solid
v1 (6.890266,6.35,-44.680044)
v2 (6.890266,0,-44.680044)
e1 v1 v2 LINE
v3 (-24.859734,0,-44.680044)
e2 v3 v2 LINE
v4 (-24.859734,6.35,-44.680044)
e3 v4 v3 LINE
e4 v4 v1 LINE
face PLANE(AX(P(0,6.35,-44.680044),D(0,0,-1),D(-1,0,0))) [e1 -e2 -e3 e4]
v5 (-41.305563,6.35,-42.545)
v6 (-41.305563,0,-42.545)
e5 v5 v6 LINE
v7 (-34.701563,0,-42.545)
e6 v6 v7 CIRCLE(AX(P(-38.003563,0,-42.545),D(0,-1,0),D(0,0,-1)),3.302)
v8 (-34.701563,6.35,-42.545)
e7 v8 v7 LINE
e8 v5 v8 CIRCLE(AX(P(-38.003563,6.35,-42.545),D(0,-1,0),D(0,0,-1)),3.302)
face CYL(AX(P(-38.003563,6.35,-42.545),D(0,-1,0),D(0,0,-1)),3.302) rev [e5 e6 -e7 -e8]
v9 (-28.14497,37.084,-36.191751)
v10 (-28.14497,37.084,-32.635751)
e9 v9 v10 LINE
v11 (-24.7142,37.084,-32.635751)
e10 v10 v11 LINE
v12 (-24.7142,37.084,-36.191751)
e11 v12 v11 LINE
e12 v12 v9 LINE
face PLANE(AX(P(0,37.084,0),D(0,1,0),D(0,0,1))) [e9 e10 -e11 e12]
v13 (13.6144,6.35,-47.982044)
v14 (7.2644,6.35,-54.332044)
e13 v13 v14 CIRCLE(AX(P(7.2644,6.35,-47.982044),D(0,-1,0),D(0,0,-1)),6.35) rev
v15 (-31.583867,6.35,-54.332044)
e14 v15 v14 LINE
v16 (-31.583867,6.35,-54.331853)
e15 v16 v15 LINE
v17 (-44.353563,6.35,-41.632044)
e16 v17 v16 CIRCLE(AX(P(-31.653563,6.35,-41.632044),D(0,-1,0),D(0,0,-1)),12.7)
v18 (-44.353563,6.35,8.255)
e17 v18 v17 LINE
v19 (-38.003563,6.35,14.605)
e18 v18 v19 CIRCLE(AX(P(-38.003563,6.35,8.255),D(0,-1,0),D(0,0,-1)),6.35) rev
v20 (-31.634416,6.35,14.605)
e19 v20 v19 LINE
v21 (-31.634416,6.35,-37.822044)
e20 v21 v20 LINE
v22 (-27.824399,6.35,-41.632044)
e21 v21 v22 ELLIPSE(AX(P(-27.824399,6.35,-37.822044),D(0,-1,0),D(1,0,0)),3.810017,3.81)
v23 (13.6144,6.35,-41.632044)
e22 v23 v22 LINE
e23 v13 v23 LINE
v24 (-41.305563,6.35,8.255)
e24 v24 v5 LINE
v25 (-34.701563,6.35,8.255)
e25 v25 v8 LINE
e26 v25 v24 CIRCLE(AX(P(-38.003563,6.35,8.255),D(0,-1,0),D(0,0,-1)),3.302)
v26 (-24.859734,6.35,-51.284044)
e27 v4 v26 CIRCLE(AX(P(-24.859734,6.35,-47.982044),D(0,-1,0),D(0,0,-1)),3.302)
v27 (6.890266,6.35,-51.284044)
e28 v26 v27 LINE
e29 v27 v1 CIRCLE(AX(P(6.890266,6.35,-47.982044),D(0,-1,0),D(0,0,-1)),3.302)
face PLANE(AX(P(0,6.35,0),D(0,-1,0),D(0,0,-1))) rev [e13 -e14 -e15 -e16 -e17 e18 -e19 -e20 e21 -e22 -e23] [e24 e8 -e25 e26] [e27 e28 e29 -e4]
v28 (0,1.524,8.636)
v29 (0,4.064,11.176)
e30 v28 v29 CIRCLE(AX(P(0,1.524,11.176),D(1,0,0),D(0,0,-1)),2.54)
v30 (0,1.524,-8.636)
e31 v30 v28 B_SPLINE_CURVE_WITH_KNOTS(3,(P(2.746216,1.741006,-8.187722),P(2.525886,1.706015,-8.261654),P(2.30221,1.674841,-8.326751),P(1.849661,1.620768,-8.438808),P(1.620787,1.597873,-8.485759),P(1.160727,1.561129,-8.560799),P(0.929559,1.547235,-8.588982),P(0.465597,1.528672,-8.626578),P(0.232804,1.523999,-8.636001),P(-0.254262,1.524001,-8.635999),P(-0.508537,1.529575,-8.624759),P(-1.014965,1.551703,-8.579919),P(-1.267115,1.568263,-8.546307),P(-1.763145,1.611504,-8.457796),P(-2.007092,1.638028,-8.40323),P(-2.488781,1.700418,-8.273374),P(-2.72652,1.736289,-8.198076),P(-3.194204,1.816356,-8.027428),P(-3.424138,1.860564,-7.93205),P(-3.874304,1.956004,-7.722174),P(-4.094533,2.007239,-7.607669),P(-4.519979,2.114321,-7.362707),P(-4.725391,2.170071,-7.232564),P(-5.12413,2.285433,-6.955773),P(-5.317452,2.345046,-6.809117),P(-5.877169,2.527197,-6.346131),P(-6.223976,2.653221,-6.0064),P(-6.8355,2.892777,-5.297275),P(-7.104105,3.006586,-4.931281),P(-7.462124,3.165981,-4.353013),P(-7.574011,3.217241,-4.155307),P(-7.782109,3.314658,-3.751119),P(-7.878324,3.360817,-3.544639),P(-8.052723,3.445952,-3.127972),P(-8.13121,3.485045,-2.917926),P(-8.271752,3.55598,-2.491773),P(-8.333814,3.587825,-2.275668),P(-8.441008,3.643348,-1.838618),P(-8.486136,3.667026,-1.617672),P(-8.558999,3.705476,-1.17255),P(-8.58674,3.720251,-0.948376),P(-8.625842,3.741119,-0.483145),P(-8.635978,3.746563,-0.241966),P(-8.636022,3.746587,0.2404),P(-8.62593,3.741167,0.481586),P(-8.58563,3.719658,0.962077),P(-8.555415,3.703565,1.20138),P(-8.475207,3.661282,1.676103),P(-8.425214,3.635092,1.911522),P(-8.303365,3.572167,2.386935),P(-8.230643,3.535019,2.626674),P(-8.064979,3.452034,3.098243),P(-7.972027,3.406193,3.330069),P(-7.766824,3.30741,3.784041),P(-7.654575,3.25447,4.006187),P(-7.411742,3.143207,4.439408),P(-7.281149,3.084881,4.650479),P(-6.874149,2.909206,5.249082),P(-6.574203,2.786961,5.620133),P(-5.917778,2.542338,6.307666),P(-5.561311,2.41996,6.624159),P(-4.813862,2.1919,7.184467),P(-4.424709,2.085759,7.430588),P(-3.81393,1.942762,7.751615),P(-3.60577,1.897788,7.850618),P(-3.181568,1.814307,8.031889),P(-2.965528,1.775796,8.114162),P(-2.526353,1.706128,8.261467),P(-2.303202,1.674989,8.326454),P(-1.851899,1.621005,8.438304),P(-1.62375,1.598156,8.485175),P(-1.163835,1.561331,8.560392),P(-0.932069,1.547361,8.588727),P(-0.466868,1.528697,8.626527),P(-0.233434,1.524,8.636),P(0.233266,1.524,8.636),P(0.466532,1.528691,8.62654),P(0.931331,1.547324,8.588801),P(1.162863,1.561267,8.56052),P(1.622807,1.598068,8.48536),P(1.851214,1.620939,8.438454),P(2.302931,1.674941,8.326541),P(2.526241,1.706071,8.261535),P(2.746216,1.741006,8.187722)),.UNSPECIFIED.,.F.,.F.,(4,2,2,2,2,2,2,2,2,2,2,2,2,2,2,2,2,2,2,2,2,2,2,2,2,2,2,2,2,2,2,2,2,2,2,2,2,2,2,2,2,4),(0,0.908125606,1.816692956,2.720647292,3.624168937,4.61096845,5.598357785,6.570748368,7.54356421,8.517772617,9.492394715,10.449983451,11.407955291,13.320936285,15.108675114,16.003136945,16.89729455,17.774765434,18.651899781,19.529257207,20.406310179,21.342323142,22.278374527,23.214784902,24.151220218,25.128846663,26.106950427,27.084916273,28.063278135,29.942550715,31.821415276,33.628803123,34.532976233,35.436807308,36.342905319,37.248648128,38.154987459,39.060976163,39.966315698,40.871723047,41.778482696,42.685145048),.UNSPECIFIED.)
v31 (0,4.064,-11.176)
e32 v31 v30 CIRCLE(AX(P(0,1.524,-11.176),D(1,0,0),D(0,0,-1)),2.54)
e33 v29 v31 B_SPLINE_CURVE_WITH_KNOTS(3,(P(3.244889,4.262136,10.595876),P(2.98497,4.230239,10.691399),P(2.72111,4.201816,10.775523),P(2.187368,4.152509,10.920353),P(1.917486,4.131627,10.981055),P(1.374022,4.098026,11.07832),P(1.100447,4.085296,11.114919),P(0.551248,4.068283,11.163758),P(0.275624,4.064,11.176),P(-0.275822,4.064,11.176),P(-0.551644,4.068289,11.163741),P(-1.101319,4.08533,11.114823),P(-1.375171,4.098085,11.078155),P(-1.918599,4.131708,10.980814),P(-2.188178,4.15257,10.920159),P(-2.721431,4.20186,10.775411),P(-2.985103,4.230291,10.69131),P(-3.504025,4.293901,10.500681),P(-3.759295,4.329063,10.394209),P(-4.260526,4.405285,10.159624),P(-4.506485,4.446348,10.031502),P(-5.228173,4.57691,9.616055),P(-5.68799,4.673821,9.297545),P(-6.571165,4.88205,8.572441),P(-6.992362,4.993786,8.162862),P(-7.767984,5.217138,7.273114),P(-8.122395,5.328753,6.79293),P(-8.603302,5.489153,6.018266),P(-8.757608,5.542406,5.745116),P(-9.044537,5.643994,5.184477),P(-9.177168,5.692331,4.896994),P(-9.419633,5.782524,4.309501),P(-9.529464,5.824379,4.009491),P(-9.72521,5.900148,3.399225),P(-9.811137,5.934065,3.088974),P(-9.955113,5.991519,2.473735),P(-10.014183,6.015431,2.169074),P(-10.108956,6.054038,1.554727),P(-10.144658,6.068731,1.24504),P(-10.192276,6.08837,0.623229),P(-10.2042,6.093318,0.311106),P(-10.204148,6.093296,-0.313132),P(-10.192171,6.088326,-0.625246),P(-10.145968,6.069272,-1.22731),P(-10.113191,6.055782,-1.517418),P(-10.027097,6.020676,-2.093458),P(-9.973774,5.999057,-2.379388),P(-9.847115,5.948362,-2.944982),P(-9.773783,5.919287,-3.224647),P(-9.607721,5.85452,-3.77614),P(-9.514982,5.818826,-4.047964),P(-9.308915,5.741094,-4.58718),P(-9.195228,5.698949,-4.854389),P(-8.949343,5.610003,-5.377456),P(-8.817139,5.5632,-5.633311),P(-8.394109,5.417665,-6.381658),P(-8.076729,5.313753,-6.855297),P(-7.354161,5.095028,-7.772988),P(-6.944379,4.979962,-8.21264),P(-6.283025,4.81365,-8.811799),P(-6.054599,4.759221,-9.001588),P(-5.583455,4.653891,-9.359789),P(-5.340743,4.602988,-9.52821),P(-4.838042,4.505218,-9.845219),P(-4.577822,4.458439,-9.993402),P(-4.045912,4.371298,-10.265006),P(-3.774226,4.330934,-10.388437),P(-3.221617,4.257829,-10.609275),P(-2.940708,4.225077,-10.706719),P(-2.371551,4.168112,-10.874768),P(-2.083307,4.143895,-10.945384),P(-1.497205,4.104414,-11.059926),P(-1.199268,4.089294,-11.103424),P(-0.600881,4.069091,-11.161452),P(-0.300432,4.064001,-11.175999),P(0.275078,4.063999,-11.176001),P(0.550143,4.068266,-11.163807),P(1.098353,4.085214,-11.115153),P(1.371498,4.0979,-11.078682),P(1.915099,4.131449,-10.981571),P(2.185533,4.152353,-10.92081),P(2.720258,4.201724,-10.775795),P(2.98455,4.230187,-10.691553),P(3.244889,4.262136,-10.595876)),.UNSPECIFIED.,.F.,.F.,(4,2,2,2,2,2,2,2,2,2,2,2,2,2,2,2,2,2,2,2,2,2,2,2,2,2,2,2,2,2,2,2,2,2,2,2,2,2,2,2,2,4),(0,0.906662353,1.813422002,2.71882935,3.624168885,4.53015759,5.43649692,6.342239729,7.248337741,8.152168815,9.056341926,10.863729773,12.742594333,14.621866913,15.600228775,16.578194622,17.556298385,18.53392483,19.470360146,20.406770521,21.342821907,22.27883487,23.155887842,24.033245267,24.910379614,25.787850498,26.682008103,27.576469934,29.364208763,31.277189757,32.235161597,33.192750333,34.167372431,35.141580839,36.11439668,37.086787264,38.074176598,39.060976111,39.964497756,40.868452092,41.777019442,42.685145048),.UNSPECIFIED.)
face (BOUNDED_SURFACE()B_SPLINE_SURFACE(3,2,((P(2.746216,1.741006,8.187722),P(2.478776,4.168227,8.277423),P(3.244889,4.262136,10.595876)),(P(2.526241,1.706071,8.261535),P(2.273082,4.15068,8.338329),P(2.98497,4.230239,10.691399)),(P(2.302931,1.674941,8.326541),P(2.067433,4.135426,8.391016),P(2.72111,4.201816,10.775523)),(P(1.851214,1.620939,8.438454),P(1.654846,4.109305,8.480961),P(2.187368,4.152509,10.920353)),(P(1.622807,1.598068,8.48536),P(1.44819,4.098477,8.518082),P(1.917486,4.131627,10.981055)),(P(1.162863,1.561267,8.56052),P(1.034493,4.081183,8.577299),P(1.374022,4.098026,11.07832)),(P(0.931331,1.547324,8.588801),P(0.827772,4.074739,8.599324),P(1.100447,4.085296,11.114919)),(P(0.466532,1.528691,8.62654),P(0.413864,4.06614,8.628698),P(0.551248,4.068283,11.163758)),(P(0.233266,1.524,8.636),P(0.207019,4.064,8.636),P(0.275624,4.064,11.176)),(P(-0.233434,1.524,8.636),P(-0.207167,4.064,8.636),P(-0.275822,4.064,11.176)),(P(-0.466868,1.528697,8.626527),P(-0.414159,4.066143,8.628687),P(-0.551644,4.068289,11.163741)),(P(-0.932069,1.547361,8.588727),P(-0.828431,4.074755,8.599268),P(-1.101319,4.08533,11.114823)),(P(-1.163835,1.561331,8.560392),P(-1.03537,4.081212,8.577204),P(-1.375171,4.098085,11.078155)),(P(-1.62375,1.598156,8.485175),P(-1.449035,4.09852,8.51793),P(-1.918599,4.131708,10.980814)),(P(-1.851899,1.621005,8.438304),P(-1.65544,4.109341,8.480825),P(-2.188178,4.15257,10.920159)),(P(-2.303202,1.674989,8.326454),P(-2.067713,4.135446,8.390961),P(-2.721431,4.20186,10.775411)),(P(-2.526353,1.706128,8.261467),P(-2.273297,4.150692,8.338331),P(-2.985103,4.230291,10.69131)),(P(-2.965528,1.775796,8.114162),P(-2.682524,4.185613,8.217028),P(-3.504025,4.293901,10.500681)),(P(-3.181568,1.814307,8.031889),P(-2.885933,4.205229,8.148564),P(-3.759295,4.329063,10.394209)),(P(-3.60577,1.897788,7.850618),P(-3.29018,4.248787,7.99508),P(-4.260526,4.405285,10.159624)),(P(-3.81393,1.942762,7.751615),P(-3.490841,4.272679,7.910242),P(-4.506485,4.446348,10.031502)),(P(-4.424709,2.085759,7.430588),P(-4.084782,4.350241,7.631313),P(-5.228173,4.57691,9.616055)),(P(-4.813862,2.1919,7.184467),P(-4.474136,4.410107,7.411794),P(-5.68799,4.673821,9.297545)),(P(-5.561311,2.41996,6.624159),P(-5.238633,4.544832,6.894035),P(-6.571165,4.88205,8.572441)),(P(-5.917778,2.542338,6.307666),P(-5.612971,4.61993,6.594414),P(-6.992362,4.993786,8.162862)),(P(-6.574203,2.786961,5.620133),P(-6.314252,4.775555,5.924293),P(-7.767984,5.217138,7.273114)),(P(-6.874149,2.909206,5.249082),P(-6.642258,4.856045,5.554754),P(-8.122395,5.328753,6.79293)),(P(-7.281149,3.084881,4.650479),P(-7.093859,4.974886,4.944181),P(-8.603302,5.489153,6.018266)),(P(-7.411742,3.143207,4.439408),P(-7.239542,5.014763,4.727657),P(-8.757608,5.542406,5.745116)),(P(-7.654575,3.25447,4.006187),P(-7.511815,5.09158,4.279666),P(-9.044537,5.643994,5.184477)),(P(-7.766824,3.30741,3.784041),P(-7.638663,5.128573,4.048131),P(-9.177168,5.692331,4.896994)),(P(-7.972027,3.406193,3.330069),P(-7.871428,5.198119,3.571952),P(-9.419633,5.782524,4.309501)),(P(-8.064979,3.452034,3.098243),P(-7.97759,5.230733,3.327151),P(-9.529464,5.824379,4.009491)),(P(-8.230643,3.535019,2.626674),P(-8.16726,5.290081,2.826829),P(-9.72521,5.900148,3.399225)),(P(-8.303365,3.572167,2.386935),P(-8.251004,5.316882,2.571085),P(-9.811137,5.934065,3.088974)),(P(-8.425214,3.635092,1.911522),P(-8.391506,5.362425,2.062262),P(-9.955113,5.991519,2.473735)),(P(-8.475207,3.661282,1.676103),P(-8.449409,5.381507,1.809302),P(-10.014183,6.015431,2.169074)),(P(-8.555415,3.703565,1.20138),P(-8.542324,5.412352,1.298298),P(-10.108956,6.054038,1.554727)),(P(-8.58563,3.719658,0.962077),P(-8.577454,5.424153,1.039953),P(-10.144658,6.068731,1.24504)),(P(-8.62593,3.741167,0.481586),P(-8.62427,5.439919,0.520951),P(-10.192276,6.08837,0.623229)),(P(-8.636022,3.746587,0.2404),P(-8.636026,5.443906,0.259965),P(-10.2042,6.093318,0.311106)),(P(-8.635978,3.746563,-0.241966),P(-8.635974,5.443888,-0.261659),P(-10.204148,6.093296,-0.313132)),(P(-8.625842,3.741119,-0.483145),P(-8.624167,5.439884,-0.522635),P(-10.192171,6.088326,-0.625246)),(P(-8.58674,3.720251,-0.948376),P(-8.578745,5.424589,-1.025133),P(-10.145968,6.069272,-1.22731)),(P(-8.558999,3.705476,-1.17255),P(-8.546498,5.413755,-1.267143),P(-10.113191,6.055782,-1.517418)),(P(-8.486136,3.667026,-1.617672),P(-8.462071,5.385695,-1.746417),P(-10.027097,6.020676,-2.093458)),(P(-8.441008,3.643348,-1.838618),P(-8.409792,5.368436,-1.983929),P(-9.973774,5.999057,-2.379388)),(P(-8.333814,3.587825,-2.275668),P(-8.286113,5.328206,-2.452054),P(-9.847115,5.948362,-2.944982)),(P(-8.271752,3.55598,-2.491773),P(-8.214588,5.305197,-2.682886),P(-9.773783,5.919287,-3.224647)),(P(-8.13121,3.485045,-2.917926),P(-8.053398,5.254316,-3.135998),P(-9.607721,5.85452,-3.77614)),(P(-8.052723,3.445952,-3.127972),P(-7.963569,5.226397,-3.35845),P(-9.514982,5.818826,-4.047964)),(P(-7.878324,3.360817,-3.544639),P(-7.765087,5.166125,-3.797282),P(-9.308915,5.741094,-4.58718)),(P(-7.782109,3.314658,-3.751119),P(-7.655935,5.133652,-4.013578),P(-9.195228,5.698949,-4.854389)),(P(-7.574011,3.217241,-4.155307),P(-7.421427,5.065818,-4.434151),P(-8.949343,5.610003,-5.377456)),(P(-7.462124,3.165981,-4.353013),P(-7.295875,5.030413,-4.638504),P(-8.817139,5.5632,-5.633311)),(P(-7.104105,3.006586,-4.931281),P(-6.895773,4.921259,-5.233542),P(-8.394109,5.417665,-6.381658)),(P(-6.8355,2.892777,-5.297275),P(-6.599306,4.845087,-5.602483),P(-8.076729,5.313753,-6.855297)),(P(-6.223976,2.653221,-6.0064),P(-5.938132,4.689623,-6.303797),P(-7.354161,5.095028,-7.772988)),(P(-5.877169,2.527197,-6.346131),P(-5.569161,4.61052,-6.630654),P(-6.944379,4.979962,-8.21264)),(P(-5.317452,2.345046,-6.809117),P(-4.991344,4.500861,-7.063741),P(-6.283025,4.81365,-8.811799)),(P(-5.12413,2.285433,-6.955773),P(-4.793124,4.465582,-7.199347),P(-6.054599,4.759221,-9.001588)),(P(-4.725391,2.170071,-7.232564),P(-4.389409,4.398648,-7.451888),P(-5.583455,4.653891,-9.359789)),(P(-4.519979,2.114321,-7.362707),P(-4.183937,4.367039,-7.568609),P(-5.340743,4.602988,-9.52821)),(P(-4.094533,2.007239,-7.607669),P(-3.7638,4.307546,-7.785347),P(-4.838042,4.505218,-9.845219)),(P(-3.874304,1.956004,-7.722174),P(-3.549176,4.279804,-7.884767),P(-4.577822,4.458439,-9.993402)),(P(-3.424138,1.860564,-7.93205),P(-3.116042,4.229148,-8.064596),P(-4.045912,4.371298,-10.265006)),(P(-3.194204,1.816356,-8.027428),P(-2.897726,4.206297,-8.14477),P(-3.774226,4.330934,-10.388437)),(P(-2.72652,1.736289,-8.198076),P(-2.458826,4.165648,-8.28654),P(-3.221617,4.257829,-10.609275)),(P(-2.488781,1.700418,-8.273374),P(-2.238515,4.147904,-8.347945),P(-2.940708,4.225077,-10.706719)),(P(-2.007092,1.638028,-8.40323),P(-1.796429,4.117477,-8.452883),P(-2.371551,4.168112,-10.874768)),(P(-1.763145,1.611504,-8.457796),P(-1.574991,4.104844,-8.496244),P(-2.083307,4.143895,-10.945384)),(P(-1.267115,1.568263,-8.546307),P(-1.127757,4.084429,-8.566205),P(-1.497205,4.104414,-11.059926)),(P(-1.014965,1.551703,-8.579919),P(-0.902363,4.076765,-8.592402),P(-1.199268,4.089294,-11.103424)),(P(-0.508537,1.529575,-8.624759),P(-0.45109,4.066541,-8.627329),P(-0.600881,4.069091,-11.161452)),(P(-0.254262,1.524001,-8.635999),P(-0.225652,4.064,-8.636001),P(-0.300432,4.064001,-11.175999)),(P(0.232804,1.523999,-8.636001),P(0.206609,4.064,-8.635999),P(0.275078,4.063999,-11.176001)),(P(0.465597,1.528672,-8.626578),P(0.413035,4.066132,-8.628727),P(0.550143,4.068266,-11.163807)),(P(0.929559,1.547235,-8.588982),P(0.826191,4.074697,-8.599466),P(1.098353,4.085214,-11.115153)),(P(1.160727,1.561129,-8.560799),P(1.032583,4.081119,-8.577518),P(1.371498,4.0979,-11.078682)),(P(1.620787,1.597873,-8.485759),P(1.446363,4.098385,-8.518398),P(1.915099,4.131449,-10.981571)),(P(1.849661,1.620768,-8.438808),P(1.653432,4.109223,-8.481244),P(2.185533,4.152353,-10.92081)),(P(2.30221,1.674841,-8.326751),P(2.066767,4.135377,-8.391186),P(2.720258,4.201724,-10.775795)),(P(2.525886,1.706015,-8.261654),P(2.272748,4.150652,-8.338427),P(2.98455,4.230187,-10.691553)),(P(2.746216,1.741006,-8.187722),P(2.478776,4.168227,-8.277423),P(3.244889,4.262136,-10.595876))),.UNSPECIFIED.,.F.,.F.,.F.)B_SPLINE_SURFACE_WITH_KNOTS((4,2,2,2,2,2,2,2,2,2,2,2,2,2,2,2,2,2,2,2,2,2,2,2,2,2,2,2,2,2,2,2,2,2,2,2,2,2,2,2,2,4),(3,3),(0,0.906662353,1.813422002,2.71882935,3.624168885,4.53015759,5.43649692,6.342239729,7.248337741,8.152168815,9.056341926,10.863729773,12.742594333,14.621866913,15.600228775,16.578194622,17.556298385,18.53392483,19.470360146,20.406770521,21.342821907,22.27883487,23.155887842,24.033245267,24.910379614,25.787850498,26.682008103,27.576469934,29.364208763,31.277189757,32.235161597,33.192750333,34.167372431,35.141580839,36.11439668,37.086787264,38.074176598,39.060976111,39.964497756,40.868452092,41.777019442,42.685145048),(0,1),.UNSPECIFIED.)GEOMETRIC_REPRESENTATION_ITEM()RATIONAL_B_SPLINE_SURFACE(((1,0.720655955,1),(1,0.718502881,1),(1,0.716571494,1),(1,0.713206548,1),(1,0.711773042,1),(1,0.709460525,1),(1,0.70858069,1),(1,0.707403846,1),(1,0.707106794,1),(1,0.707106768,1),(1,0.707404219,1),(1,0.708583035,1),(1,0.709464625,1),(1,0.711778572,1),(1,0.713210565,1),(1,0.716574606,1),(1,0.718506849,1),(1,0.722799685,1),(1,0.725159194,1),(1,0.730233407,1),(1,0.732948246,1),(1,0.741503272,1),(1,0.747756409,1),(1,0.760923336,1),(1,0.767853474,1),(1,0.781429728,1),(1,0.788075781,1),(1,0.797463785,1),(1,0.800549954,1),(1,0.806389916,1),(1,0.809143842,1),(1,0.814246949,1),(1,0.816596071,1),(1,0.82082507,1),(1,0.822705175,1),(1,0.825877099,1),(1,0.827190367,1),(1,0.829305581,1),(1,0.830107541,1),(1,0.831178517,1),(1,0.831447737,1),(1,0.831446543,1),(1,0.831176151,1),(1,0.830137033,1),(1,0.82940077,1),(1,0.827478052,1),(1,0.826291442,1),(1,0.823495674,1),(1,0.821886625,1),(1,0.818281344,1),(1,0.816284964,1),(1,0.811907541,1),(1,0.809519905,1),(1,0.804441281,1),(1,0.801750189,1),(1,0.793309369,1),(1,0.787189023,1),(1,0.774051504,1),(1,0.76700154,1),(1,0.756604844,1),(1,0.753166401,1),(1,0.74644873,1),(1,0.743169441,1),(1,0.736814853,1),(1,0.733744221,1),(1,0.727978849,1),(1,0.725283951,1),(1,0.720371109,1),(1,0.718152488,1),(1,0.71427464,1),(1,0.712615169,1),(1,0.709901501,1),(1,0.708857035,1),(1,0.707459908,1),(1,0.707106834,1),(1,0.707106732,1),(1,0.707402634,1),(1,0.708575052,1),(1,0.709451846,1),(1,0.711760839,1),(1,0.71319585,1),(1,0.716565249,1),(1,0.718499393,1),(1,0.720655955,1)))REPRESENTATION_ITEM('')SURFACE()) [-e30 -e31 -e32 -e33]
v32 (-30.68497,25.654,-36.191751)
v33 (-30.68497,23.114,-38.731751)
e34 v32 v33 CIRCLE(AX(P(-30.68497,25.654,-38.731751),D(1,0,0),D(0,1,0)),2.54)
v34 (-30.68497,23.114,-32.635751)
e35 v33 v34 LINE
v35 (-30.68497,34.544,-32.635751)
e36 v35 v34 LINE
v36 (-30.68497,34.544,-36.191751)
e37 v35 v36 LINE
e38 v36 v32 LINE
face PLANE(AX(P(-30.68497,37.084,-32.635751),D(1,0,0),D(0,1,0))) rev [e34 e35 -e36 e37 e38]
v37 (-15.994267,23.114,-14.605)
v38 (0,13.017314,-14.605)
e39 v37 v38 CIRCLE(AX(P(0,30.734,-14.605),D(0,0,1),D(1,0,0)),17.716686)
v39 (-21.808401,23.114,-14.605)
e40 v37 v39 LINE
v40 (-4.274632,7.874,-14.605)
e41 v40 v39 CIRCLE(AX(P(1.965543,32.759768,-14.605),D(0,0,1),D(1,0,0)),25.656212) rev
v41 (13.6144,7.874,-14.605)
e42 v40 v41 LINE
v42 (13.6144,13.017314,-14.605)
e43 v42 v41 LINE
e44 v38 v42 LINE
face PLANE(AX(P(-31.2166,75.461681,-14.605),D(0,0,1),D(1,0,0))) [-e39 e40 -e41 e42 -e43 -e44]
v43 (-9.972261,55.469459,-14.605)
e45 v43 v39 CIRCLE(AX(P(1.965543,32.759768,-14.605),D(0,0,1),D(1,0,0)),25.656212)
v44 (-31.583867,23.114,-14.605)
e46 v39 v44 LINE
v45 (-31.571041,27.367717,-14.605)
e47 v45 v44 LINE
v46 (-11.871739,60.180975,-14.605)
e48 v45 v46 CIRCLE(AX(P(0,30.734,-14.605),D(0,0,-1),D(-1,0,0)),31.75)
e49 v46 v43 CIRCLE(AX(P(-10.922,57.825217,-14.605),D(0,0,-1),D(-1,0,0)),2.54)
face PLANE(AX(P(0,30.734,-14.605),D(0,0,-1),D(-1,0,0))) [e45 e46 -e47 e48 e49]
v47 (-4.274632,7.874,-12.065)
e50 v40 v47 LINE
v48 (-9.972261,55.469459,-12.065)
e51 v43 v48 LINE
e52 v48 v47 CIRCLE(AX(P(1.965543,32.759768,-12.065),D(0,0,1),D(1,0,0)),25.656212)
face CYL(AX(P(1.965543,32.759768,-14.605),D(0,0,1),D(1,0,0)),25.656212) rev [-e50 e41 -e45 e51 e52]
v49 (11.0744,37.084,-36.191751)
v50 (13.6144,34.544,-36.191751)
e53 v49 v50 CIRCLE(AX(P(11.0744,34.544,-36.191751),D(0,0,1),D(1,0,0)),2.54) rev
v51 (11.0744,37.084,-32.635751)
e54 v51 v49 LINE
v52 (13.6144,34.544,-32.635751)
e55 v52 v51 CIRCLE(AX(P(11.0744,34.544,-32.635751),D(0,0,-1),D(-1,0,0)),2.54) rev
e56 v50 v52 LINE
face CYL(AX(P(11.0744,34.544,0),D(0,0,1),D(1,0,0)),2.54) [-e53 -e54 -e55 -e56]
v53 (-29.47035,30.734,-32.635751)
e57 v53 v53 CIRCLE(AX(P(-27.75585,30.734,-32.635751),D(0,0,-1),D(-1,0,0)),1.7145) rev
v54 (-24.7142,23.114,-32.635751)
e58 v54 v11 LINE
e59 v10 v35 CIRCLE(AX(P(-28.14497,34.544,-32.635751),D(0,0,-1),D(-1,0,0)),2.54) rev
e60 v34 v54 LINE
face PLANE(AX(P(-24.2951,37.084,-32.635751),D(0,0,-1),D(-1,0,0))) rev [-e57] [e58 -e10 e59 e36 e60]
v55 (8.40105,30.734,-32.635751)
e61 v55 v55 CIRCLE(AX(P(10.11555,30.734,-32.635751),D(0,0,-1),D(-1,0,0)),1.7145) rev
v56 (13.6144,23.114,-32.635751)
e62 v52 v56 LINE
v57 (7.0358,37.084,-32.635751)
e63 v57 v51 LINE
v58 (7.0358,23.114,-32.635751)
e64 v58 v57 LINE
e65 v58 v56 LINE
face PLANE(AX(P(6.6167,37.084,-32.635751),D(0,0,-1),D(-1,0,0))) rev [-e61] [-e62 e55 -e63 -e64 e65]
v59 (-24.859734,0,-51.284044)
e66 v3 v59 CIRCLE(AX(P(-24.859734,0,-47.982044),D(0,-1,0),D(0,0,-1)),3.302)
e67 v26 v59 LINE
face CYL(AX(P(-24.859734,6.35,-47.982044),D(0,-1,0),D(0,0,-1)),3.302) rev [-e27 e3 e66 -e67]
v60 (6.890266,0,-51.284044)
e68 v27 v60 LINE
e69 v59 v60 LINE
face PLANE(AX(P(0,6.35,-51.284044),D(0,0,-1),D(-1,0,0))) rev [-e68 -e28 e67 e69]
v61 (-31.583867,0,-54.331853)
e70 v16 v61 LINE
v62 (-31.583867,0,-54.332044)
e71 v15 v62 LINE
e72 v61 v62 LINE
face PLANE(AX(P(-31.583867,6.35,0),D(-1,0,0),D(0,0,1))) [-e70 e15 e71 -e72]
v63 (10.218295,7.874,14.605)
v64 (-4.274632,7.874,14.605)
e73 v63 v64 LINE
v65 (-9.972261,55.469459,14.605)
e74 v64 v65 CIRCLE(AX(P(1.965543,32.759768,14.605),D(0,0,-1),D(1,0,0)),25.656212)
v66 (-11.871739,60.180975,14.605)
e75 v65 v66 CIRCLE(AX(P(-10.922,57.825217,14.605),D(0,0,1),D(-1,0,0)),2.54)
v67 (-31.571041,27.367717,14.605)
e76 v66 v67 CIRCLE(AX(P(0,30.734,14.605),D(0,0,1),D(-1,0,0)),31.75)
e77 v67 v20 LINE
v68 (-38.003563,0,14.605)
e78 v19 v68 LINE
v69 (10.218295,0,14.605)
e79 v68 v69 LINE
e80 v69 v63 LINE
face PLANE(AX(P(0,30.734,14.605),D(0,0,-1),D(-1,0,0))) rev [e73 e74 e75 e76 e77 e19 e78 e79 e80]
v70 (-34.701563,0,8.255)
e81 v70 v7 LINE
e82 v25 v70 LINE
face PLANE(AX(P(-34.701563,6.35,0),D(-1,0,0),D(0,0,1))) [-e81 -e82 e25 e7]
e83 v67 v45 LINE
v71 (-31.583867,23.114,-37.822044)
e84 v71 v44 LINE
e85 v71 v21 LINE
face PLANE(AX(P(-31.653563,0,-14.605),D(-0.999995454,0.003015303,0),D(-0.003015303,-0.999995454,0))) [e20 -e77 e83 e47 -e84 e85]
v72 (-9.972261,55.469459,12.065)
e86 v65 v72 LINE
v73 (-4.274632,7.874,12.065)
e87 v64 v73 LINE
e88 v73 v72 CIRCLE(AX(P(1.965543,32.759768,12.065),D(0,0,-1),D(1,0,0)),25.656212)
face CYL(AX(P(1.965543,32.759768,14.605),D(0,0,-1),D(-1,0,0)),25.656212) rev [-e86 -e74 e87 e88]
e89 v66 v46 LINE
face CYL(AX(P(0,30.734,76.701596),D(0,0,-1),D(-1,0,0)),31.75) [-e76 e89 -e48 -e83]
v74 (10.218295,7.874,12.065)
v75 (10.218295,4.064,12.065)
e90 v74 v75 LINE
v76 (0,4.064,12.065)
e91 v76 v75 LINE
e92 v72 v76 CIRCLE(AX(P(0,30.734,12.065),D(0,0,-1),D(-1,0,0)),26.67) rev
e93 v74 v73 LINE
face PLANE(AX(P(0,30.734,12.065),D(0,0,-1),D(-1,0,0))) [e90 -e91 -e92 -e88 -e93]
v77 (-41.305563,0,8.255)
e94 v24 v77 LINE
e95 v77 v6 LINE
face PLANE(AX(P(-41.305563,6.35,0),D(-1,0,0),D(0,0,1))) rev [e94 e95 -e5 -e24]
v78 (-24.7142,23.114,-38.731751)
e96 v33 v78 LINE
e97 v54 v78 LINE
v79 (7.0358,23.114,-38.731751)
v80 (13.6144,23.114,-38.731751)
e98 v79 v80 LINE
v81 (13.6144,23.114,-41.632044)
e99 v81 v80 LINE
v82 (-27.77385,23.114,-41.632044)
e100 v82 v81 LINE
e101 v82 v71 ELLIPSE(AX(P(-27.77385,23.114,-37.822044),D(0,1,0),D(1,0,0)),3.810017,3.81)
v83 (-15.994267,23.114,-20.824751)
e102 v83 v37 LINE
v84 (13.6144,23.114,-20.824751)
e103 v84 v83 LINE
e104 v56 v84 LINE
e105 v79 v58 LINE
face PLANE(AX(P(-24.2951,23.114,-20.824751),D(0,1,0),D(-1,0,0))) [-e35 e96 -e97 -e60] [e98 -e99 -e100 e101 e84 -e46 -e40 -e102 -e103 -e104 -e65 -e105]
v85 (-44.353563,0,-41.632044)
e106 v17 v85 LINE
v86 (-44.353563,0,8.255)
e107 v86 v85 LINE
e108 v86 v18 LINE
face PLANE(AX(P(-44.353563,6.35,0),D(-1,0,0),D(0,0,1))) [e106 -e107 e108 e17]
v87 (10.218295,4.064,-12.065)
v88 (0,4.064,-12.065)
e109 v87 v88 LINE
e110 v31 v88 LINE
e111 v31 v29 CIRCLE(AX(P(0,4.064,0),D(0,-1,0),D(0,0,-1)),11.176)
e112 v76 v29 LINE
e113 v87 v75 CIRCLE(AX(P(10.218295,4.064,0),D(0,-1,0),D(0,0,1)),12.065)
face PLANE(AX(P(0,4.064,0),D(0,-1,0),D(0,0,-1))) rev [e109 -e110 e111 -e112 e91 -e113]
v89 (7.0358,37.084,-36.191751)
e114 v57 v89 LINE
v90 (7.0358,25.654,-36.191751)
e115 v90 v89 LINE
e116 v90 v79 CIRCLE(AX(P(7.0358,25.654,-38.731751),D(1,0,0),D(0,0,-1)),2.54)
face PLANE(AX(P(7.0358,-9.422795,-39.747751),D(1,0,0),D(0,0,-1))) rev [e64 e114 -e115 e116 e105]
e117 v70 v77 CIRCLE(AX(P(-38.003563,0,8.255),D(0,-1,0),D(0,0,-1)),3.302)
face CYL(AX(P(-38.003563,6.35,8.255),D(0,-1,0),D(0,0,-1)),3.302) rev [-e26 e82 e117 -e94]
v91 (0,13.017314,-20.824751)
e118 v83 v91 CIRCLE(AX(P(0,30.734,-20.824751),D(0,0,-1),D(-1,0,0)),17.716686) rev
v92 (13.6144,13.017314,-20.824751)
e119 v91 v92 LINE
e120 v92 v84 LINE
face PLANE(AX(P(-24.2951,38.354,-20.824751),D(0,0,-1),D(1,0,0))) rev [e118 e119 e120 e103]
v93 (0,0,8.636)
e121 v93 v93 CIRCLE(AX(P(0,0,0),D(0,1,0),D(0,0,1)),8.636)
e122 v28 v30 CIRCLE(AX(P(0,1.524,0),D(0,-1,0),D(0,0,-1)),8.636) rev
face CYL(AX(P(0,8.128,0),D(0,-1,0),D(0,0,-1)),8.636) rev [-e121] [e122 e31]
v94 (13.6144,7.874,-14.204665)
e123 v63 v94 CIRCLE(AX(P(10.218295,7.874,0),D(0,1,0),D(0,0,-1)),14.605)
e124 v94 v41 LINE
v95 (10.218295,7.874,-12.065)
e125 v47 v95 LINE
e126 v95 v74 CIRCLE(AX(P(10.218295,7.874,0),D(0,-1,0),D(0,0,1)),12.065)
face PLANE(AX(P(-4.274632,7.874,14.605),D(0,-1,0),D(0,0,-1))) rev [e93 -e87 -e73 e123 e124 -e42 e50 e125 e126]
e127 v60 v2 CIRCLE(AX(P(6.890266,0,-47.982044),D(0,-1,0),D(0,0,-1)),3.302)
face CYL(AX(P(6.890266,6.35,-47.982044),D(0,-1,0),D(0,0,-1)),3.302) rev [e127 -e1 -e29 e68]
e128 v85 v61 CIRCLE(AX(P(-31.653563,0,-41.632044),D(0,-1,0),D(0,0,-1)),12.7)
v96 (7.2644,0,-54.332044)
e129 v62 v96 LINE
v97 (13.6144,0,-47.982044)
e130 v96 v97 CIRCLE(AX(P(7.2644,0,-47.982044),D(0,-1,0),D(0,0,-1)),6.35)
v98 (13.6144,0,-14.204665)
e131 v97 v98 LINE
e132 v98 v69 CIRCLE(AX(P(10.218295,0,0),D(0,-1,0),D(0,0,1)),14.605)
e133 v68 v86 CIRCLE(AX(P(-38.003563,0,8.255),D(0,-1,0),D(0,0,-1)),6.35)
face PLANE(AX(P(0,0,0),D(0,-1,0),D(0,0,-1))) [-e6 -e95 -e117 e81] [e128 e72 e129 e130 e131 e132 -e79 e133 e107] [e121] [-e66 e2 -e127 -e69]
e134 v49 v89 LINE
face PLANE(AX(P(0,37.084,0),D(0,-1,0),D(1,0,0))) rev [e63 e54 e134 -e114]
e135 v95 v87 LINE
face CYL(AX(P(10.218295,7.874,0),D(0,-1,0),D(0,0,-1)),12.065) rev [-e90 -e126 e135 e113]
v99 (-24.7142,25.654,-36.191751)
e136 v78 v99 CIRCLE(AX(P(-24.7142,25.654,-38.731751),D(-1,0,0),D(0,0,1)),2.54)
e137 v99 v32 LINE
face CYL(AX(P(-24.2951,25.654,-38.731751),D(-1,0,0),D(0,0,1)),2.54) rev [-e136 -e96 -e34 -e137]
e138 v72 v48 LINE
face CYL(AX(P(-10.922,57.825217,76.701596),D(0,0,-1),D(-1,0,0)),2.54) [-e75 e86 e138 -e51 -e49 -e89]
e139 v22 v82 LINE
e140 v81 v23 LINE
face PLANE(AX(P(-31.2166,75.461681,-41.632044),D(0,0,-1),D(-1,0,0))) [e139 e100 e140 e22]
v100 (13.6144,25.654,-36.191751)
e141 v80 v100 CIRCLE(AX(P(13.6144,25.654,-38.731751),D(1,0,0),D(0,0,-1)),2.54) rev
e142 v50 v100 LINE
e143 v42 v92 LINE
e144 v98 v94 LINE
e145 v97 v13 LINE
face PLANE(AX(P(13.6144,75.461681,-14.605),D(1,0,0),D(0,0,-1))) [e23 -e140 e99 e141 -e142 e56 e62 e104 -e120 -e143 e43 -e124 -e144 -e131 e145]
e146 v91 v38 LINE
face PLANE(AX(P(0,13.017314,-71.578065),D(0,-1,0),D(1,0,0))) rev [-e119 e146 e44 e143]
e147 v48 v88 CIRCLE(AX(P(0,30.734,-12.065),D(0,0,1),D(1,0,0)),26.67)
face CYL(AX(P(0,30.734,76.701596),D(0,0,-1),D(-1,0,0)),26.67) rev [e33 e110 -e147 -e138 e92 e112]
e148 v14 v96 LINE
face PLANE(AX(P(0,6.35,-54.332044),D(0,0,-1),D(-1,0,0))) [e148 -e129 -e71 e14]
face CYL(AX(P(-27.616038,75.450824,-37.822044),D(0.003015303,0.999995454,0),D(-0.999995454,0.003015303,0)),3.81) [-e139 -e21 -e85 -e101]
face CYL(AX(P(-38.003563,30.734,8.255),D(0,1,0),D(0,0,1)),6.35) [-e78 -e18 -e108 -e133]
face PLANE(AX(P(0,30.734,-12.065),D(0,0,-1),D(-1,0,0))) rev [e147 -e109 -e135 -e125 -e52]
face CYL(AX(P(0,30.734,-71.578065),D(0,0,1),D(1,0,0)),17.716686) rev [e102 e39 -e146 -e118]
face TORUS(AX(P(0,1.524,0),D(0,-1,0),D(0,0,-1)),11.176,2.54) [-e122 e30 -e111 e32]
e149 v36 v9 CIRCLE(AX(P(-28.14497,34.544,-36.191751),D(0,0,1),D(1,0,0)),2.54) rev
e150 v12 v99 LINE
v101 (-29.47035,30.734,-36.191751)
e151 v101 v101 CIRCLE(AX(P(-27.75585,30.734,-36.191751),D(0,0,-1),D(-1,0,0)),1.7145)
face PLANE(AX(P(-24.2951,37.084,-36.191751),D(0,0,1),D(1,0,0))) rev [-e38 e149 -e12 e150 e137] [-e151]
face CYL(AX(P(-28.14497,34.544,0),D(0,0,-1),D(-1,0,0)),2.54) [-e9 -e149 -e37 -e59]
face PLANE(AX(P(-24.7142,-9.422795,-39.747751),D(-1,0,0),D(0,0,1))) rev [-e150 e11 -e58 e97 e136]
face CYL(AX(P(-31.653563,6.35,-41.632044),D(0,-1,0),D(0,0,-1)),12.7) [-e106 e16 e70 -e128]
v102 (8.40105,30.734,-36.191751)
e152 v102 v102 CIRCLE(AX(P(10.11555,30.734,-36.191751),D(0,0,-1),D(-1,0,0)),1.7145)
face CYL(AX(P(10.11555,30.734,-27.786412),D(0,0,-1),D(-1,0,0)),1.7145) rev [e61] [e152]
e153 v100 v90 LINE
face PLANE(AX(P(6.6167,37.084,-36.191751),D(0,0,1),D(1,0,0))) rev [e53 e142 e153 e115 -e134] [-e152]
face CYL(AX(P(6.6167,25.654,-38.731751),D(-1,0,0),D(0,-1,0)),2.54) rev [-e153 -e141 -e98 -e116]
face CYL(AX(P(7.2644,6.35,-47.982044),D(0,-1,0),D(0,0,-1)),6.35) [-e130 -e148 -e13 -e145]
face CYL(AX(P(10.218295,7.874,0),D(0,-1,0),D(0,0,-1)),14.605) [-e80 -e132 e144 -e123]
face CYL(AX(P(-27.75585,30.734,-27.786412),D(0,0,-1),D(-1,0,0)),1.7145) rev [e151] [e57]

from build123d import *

# Parameters (mm, degrees)
SKETCH1_W                       = 63.5
SKETCH1_H                       = 24.13
BOSS_EXTRUDE1_DEPTH             = 4.064
BOSS_EXTRUDE2_REACH             = 36.207
BOSS_EXTRUDE2_DIRECTION_2_REACH = 36.207
CUT_EXTRUDE1_DEPTH              = 4.064
CUT_EXTRUDE1_DEPTH_BACK         = 66.752974943
SKETCH4_R                       = 8.636
FILLET1_R                       = 2.54
CUT_EXTRUDE2_DEPTH              = 73.348315655
BOSS_EXTRUDE3_DEPTH             = 2.54
BOSS_EXTRUDE4_START             = 2.54
BOSS_EXTRUDE4_DEPTH             = 2.54
BOSS_EXTRUDE5_DEPTH             = 3.81
CUT_EXTRUDE3_DEPTH              = 64.061052508
BOSS_EXTRUDE6_START             = -23.114
SKETCH12_W                      = 44.831
SKETCH12_H                      = 27.027043781
BOSS_EXTRUDE6_DEPTH             = 23.114
BOSS_EXTRUDE7_DEPTH             = 7.874
CUT_EXTRUDE4_START              = -6.219751
CUT_EXTRUDE4_DEPTH              = 6.219751
CUT_EXTRUDE5_DEPTH              = 27.027043781
SKETCH17_W                      = 6.9977
SKETCH17_H                      = 3.556
BOSS_EXTRUDE8_DEPTH             = 13.97
SKETCH18_W                      = 6.389869694
SKETCH18_H                      = 3.556
BOSS_EXTRUDE9_DEPTH             = 13.97
SKETCH19_W                      = 31.75
SKETCH19_H                      = 7.112
CUT_EXTRUDE6_DEPTH              = 13.97
CUT_EXTRUDE7_REACH              = 87.043
SKETCH20_R                      = 1.7145
FILLET2_R                       = 2.54
FILLET3_R                       = 2.54
FILLET4_R                       = 2.54
BOSS_EXTRUDE10_DEPTH            = 29.21
BOSS_EXTRUDE11_DEPTH            = 27.027043781
BOSS_EXTRUDE16_DEPTH            = 6.35
FILLET5_R                       = 6.35
FILLET6_R                       = 3.81


with BuildPart() as part:
    # Sketch1 → Boss-Extrude1 (new body)
    with BuildSketch(Plane(origin=(0, 0, 0), x_dir=(1, 0, 0), z_dir=(0, 1, 0))):
        Rectangle(SKETCH1_W, SKETCH1_H)
    extrude(amount=BOSS_EXTRUDE1_DEPTH)

    # Boss-Extrude2: up to this face of the body (flat: up to its plane)
    boss_extrude2_end = Plane(part.part.faces().sort_by_distance((0, 2.032, 12.065))[0])
    # Sketch2 → Boss-Extrude2 (add, up to the picked face)
    with BuildSketch(Plane.XY, mode=Mode.PRIVATE) as boss_extrude2_sk1:
        with BuildLine():
            Line((0, 4.064), (-26.716755185, 4.064))
            Line((-26.716755185, 4.064), (-31.571041118, 27.367716778))
            ThreePointArc((-31.571041118, 27.367716778), (-27.221246487, 47.076161415), (-11.87173913, 60.180974548))
            ThreePointArc((-11.87173913, 60.180974548), (-8.566242036, 58.774955714), (-9.97226087, 55.46945862))
            ThreePointArc((-9.97226087, 55.46945862), (-26.181898149, 25.654914521), (0, 4.064))
        make_face()
    boss_extrude2_tool1 = split(extrude(boss_extrude2_sk1.sketch, amount=BOSS_EXTRUDE2_REACH, mode=Mode.PRIVATE), bisect_by=boss_extrude2_end, keep=Keep.BOTH, mode=Mode.PRIVATE)
    add(boss_extrude2_tool1.solids().sort_by(Axis((-9.165723, 58.533271, 0), (0, 0, 1)))[0])

    # Boss-Extrude2 direction 2: up to this face of the body (flat: up to its plane)
    boss_extrude2_direction_2_end = Plane(part.part.faces().sort_by_distance((0, 2.032, -12.065))[0])
    # Sketch2 → Boss-Extrude2 direction 2 (add, up to the picked face)
    with BuildSketch(Plane.XY, mode=Mode.PRIVATE) as boss_extrude2_direction_2_sk1:
        with BuildLine():
            Line((0, 4.064), (-26.716755185, 4.064))
            Line((-26.716755185, 4.064), (-31.571041118, 27.367716778))
            ThreePointArc((-31.571041118, 27.367716778), (-27.221246487, 47.076161415), (-11.87173913, 60.180974548))
            ThreePointArc((-11.87173913, 60.180974548), (-8.566242036, 58.774955714), (-9.97226087, 55.46945862))
            ThreePointArc((-9.97226087, 55.46945862), (-26.181898149, 25.654914521), (0, 4.064))
        make_face()
    boss_extrude2_direction_2_tool1 = split(extrude(boss_extrude2_direction_2_sk1.sketch, amount=-BOSS_EXTRUDE2_DIRECTION_2_REACH, mode=Mode.PRIVATE), bisect_by=boss_extrude2_direction_2_end, keep=Keep.BOTH, mode=Mode.PRIVATE)
    add(boss_extrude2_direction_2_tool1.solids().sort_by(Axis((-9.165723, 58.533271, 0), (0, 0, -1)))[0])

    # Sketch4 → Cut-Extrude1 (cut, two sides: drawn at the far end of the back side and taken through both)
    with BuildSketch(Plane(origin=(0, 4.064, 0), x_dir=(1, 0, 0), z_dir=(0, 1, 0)).offset(-CUT_EXTRUDE1_DEPTH_BACK)):
        with Locations(Location((0, 0, 0), (0, 0, 270))):
            Circle(SKETCH4_R)
    extrude(amount=CUT_EXTRUDE1_DEPTH + CUT_EXTRUDE1_DEPTH_BACK, mode=Mode.SUBTRACT)

    # Fillet1
    fillet1_edges = [part.edges().sort_by_distance(p)[0] for p in [
        (-8.636, 5.50091846, 0),
        (8.636, 4.064, 0),
    ]]
    fillet(fillet1_edges, radius=FILLET1_R)

    # Sketch6 → Cut-Extrude2 (cut, through all)
    with BuildSketch(Plane.XY.offset(12.065)):
        Polygon((-31.75, 4.064), (-26.716755185, 4.064), (-25.870202757, 0), (-31.75, 0), align=None)
    extrude(amount=-CUT_EXTRUDE2_DEPTH, mode=Mode.SUBTRACT)

    # Sketch8 → Boss-Extrude3 (add)
    with BuildSketch(Plane.XY.offset(12.065)):
        with BuildLine():
            Line((31.75, 0), (31.75, 7.874))
            Line((31.75, 7.874), (-4.274632474, 7.874))
            ThreePointArc((-4.274632474, 7.874), (-23.508790492, 29.710248048), (-9.97226087, 55.46945862))
            ThreePointArc((-9.97226087, 55.46945862), (-8.566242036, 58.774955714), (-11.87173913, 60.180974548))
            ThreePointArc((-11.87173913, 60.180974548), (-27.221246487, 47.076161415), (-31.571041118, 27.367716778))
            Line((-31.571041118, 27.367716778), (-25.870202757, 0))
            Line((-25.870202757, 0), (31.75, 0))
        make_face()
    extrude(amount=BOSS_EXTRUDE3_DEPTH)

    # Sketch9 → Boss-Extrude4 (add)
    with BuildSketch(Plane(origin=(0, 0, -12.065), x_dir=(-1, 0, 0), z_dir=(0, 0, -1)).offset(BOSS_EXTRUDE4_START)):
        with BuildLine():
            Line((-31.75, 0), (-31.75, 7.874))
            Line((-31.75, 7.874), (4.274632474, 7.874))
            ThreePointArc((4.274632474, 7.874), (23.508790492, 29.710248048), (9.97226087, 55.46945862))
            ThreePointArc((9.97226087, 55.46945862), (8.566242036, 58.774955714), (11.87173913, 60.180974548))
            ThreePointArc((11.87173913, 60.180974548), (27.221246487, 47.076161415), (31.571041118, 27.367716778))
            Line((31.571041118, 27.367716778), (25.870202757, 0))
            Line((25.870202757, 0), (-31.75, 0))
        make_face()
    extrude(amount=-BOSS_EXTRUDE4_DEPTH)

    # Sketch10 → Boss-Extrude5 (add)
    with BuildSketch(Plane(origin=(0, 4.064, 0), x_dir=(1, 0, 0), z_dir=(0, 1, 0))):
        with BuildLine():
            Line((10.218295125, 14.605), (10.218295125, 12.065))
            ThreePointArc((10.218295125, 12.065), (22.283295125, 0), (10.218295125, -12.065))
            Line((10.218295125, -12.065), (10.218295125, -14.605))
            ThreePointArc((10.218295125, -14.605), (24.823295125, 0), (10.218295125, 14.605))
        make_face()
    extrude(amount=BOSS_EXTRUDE5_DEPTH)

    # Sketch11 → Cut-Extrude3 (cut, through all)
    with BuildSketch(Plane(origin=(0, 7.874, 0), x_dir=(1, 0, 0), z_dir=(0, 1, 0))):
        with BuildLine():
            Line((10.218295125, 14.605), (31.75, 14.605))
            Line((31.75, 14.605), (31.75, -14.605))
            Line((31.75, -14.605), (10.218295125, -14.605))
            ThreePointArc((10.218295125, -14.605), (24.823295125, 0), (10.218295125, 14.605))
        make_face()
    extrude(amount=-CUT_EXTRUDE3_DEPTH, mode=Mode.SUBTRACT)

    # Sketch12 → Boss-Extrude6 (add)
    with BuildSketch(Plane.XZ.offset(BOSS_EXTRUDE6_START)):
        with Locations((-8.8011, -28.11852189)):
            Rectangle(SKETCH12_W, SKETCH12_H)
    extrude(amount=BOSS_EXTRUDE6_DEPTH)

    # Sketch13 → Boss-Extrude7 (add)
    with BuildSketch(Plane.XZ):
        Polygon((10.218295125, -14.605), (13.6144, -14.605), (13.6144, -13.335525526), align=None)
    extrude(amount=-BOSS_EXTRUDE7_DEPTH)

    # Sketch14 → Cut-Extrude4 (cut)
    with BuildSketch(Plane.XY.offset(-14.605).offset(CUT_EXTRUDE4_START)):
        with BuildLine():
            Line((0, 13.017313502), (18.620278687, 13.017313502))
            Line((18.620278687, 13.017313502), (17.716686498, 30.734))
            ThreePointArc((17.716686498, 30.734), (-12.527589163, 43.261589163), (0, 13.017313502))
        make_face()
    extrude(amount=CUT_EXTRUDE4_DEPTH, mode=Mode.SUBTRACT)

    # Sketch16 → Cut-Extrude5 (cut)
    with BuildSketch(Plane.XY.offset(-14.605)):
        Polygon((-31.2166, 23.114), (-30.684969694, 23.114), (-25.870202757, 0), (-31.2166, 0), align=None)
    extrude(amount=-CUT_EXTRUDE5_DEPTH, mode=Mode.SUBTRACT)

    # Sketch17 → Boss-Extrude8 (add)
    with BuildSketch(Plane(origin=(0, 23.114, 0), x_dir=(1, 0, 0), z_dir=(0, 1, 0))):
        with Locations((10.11555, 34.413750632)):
            Rectangle(SKETCH17_W, SKETCH17_H)
    extrude(amount=BOSS_EXTRUDE8_DEPTH)

    # Sketch18 → Boss-Extrude9 (add)
    with BuildSketch(Plane(origin=(0, 23.114, 0), x_dir=(1, 0, 0), z_dir=(0, 1, 0))):
        with Locations((-27.490034847, 34.413750632)):
            Rectangle(SKETCH18_W, SKETCH18_H)
    extrude(amount=BOSS_EXTRUDE9_DEPTH)

    # Sketch19 → Cut-Extrude6 (cut)
    with BuildSketch(Plane(origin=(0, 37.084, 0), x_dir=(1, 0, 0), z_dir=(0, 1, 0))):
        with Locations((-8.8392, 36.191750632)):
            Rectangle(SKETCH19_W, SKETCH19_H)
    extrude(amount=-CUT_EXTRUDE6_DEPTH, mode=Mode.SUBTRACT)

    # Sketch20 → Cut-Extrude7 (cut, up to next)
    with BuildSketch(Plane(origin=(0, 0, -36.191750632), x_dir=(-1, 0, 0), z_dir=(0, 0, -1)), mode=Mode.PRIVATE) as cut_extrude7_sk1:
        with Locations((27.75585, 30.734)):
            Circle(SKETCH20_R)
    cut_extrude7_tool1 = extrude(cut_extrude7_sk1.sketch, amount=-CUT_EXTRUDE7_REACH, mode=Mode.PRIVATE) & part.part
    # Sketch20 → Cut-Extrude7 (cut, up to next)
    with BuildSketch(Plane(origin=(0, 0, -36.191750632), x_dir=(-1, 0, 0), z_dir=(0, 0, -1)), mode=Mode.PRIVATE) as cut_extrude7_sk2:
        with Locations((-10.11555, 30.734)):
            Circle(SKETCH20_R)
    cut_extrude7_tool2 = extrude(cut_extrude7_sk2.sketch, amount=-CUT_EXTRUDE7_REACH, mode=Mode.PRIVATE) & part.part
    add(cut_extrude7_tool1.solids().sort_by_distance((-27.75585, 30.734, -36.191751))[0], mode=Mode.SUBTRACT)
    add(cut_extrude7_tool2.solids().sort_by_distance((10.11555, 30.734, -36.191751))[0], mode=Mode.SUBTRACT)

    # Fillet2
    fillet2_edges = [part.edges().sort_by_distance(p)[0] for p in [
        (10.3251, 23.114, -36.191750632),
    ]]
    fillet(fillet2_edges, radius=FILLET2_R)

    # Fillet3
    fillet3_edges = [part.edges().sort_by_distance(p)[0] for p in [
        (-27.699584847, 23.114, -36.191750632),
    ]]
    fillet(fillet3_edges, radius=FILLET3_R)

    # Fillet4
    fillet4_edges = [part.edges().sort_by_distance(p)[0] for p in [
        (13.6144, 37.084, -34.413750632),
        (-30.684969694, 37.084, -34.413750632),
    ]]
    fillet(fillet4_edges, radius=FILLET4_R)

    # Sketch26 → Boss-Extrude10 (add)
    with BuildSketch(Plane.XY.offset(14.605)):
        Polygon((-25.870202757, 0), (-31.653563464, 0), (-31.571041118, 27.367716778), align=None)
    extrude(amount=-BOSS_EXTRUDE10_DEPTH)

    # Sketch22 → Boss-Extrude11 (add)
    with BuildSketch(Plane(origin=(0, 0, -14.605), x_dir=(-1, 0, 0), z_dir=(0, 0, -1))):
        Polygon((30.684969694, 23.114), (31.583867423, 23.114), (31.653563464, 0), (25.870202757, 0), align=None)
    extrude(amount=BOSS_EXTRUDE11_DEPTH)

    # Sketch23 → Boss-Extrude16 (add)
    with BuildSketch(Plane.XZ):
        with BuildLine():
            Line((-15.554631727, 14.605), (-44.353563464, 14.605))
            Line((-44.353563464, 14.605), (-44.353563464, -41.632043781))
            ThreePointArc((-44.353563464, -41.632043781), (-40.609144413, -50.636907459), (-31.583867423, -54.331852538))
            Line((-31.583867423, -54.331852538), (13.6144, -54.332043781))
            Line((13.6144, -54.332043781), (13.6144, -35.10352189))
            Line((13.6144, -35.10352189), (-15.554631727, -35.10352189))
            Line((-15.554631727, -35.10352189), (-15.554631727, 14.605))
        make_face()
        with BuildLine():
            Line((-34.701563464, 8.255), (-34.701563464, -42.545))
            ThreePointArc((-34.701563464, -42.545), (-38.003563464, -45.847), (-41.305563464, -42.545))
            Line((-41.305563464, -42.545), (-41.305563464, 8.255))
            ThreePointArc((-41.305563464, 8.255), (-38.003563464, 11.557), (-34.701563464, 8.255))
        make_face(mode=Mode.SUBTRACT)
        with BuildLine():
            Line((-24.859733712, -44.680043781), (6.890266288, -44.680043781))
            ThreePointArc((6.890266288, -44.680043781), (10.192266288, -47.982043781), (6.890266288, -51.284043781))
            Line((6.890266288, -51.284043781), (-24.859733712, -51.284043781))
            ThreePointArc((-24.859733712, -51.284043781), (-28.161733712, -47.982043781), (-24.859733712, -44.680043781))
        make_face(mode=Mode.SUBTRACT)
    extrude(amount=-BOSS_EXTRUDE16_DEPTH)

    # Fillet5
    fillet5_edges = [part.edges().sort_by_distance(p)[0] for p in [
        (13.6144, 3.175, -54.332043781),
        (-44.353563464, 3.175, 14.605),
    ]]
    fillet(fillet5_edges, radius=FILLET5_R)

    # Fillet6
    fillet6_edges = [part.edges().sort_by_distance(p)[0] for p in [
        (-31.609141812, 14.732, -41.632043781),
    ]]
    fillet(fillet6_edges, radius=FILLET6_R)


solid = part.part
